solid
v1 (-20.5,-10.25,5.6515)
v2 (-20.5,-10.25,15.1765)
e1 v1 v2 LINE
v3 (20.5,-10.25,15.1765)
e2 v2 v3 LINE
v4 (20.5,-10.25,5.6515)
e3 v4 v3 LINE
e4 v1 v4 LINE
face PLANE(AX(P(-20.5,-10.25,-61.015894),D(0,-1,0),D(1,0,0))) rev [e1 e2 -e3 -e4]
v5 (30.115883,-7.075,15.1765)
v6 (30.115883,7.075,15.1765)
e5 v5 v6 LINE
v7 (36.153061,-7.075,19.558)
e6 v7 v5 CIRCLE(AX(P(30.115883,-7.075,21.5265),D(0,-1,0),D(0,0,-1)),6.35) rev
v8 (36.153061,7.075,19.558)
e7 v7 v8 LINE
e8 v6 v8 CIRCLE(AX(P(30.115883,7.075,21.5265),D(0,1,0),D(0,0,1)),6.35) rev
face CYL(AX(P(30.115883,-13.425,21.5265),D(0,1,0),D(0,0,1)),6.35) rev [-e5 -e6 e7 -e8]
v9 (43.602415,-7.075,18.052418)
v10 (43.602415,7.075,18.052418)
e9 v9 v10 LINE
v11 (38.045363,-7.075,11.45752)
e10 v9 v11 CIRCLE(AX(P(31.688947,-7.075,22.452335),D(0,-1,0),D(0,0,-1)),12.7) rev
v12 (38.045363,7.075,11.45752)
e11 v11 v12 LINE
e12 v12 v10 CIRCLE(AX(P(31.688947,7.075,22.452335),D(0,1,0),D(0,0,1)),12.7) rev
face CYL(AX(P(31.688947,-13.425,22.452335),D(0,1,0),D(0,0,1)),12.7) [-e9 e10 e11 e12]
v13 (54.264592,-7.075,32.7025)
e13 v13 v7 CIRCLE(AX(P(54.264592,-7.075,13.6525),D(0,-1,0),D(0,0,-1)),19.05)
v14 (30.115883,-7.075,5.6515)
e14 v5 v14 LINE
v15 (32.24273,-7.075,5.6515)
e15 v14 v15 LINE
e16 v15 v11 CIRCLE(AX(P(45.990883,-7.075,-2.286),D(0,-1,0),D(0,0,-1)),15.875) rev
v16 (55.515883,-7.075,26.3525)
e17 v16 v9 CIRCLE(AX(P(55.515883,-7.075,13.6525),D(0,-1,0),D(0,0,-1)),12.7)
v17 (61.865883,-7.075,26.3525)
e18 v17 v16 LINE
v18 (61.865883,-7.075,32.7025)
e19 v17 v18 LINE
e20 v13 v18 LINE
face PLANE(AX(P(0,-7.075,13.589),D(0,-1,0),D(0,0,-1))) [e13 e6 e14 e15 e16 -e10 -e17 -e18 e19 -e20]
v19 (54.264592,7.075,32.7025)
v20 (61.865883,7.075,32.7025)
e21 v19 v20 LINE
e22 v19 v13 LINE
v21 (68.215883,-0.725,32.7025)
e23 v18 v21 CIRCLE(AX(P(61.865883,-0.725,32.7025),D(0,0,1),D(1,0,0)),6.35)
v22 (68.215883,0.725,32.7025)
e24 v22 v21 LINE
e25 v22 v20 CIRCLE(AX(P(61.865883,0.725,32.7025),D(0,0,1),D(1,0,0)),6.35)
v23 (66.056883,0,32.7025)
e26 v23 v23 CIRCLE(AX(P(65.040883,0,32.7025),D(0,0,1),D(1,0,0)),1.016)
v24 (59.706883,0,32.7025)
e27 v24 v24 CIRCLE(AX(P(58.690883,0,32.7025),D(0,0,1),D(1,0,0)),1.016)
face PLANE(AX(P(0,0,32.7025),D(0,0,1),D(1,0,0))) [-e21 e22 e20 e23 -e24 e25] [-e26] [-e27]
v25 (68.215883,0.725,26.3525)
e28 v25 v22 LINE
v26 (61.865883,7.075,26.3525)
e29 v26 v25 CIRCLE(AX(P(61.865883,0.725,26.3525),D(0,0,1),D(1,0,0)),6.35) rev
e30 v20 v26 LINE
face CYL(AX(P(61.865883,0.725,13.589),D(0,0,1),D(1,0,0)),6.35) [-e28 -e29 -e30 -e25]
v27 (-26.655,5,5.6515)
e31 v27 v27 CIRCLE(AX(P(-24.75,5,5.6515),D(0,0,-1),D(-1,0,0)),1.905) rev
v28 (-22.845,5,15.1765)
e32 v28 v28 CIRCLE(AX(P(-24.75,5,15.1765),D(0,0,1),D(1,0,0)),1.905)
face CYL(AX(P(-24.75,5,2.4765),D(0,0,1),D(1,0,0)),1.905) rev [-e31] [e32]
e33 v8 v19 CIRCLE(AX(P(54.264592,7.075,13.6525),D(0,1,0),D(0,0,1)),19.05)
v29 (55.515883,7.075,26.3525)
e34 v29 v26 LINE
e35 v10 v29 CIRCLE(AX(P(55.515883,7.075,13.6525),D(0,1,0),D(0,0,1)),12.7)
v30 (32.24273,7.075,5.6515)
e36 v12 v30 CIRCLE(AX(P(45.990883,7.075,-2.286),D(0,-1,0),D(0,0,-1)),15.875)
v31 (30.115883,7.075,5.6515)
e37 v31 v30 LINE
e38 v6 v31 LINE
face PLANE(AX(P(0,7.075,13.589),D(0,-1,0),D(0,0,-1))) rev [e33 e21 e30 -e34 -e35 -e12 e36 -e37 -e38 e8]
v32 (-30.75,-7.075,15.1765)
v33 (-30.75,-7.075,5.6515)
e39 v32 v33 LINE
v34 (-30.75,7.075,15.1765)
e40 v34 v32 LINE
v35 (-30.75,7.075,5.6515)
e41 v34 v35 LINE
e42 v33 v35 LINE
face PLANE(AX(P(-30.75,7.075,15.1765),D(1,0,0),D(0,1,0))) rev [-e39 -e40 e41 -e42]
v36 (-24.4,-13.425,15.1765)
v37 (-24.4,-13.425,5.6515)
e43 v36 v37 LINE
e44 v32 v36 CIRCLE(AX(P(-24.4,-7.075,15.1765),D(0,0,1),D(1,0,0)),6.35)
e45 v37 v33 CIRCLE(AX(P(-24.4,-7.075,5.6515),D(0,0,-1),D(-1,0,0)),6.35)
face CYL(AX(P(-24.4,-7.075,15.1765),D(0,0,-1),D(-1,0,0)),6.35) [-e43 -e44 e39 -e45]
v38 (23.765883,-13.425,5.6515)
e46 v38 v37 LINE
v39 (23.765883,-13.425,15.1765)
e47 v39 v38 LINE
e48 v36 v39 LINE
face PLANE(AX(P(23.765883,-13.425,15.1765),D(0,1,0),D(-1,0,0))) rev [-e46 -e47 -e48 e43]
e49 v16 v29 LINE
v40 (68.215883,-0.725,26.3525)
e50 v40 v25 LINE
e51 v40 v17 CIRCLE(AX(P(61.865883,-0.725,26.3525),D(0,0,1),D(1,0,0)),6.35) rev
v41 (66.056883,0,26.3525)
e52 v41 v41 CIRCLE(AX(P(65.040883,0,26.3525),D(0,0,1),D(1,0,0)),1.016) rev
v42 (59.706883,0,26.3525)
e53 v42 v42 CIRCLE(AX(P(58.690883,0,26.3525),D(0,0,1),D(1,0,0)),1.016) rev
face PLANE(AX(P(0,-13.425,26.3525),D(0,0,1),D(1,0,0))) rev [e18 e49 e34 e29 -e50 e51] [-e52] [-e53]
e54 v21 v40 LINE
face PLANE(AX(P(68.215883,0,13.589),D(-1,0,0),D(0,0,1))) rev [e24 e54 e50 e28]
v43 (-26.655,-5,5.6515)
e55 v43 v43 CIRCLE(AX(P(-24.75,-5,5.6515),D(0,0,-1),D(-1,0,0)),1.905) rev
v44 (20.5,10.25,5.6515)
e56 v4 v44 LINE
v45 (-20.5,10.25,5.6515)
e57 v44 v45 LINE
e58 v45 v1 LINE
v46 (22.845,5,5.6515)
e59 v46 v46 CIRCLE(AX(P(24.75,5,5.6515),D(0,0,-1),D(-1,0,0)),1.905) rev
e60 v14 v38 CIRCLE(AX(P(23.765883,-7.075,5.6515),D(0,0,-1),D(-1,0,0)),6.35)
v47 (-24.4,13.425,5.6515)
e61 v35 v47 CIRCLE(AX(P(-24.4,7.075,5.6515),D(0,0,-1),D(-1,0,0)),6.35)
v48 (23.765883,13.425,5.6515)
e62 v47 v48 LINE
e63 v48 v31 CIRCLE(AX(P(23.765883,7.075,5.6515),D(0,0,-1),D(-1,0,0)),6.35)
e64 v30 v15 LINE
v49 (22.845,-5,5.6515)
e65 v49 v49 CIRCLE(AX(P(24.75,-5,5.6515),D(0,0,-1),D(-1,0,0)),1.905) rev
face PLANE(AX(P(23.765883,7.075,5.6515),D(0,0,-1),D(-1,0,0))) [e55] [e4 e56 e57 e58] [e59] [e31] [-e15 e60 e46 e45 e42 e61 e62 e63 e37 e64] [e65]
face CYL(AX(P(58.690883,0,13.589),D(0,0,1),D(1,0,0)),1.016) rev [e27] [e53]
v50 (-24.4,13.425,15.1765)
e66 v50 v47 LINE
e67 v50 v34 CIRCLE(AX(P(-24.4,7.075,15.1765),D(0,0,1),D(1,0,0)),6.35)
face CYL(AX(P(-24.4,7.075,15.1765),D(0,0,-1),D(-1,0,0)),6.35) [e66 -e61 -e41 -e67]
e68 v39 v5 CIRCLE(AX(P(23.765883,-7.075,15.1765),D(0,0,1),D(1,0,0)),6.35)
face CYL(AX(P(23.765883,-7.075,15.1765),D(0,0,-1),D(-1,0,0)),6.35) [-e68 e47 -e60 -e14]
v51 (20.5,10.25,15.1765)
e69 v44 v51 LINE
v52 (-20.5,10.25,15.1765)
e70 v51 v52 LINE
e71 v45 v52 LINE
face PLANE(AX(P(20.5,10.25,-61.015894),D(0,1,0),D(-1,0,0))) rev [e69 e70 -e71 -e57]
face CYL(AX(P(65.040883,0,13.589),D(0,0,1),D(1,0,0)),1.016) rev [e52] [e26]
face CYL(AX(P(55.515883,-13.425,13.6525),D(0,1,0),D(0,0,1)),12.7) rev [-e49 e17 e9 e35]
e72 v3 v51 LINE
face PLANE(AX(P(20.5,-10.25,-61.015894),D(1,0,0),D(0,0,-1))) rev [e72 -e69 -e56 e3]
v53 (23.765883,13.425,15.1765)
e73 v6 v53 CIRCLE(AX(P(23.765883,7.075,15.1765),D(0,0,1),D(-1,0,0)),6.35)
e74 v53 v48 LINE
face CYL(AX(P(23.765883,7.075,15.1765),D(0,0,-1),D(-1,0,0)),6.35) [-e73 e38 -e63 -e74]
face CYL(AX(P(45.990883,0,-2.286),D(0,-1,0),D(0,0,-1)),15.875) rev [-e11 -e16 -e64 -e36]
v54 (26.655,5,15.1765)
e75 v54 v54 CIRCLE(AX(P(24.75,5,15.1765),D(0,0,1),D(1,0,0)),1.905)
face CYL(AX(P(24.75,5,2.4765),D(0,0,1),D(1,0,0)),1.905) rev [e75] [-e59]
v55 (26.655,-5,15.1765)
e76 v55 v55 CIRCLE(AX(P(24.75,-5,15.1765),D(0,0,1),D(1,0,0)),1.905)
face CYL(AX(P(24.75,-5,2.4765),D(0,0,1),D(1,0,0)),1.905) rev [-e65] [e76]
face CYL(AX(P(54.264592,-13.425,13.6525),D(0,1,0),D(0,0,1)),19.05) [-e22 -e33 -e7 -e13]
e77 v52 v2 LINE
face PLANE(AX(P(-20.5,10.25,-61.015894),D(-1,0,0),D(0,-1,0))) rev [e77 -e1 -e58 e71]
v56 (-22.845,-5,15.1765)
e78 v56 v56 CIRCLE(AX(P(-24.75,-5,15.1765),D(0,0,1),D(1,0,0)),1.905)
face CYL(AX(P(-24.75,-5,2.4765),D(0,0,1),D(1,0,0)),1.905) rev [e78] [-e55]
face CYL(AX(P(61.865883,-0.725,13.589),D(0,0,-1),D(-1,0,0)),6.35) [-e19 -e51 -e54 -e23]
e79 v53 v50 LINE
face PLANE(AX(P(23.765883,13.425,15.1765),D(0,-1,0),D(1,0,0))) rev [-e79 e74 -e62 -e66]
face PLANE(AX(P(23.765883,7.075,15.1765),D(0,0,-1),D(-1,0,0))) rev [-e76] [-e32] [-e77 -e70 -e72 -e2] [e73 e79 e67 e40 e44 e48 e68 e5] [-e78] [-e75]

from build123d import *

# Parameters (mm, degrees)
BOSS_EXTRUDE1_DEPTH      = 15.1765
SKETCH3_W                = 41
SKETCH3_H                = 20.5
CUT_EXTRUDE1_DEPTH       = 27.178
SKETCH4_R                = 1.905
CUT_EXTRUDE2_DEPTH       = 12.7
SKETCH5_W                = 6.35
SKETCH5_H                = 9.525
CUT_EXTRUDE3_DEPTH       = 10.25
BOSS_EXTRUDE2_DEPTH      = 17.526
BOSS_EXTRUDE2_DEPTH_BACK = 1.5875
SKETCH7_W                = 38.1
SKETCH7_H                = 14.15
SKETCH7_R                = 1.016
FILLET3_R                = 15.875
FILLET4_R                = 6.35
CUT_EXTRUDE4_DEPTH       = 79.37799596
SKETCH11_W               = 161.059050972
SKETCH11_H               = 91.650514338
CUT_EXTRUDE5_DEPTH       = 20.828


with BuildPart() as part:
    # Sketch2 → Boss-Extrude1 (new, symmetric)
    with BuildSketch(Plane.XY):
        with BuildLine():
            Line((23.765883374, 13.425), (-24.4, 13.425))
            ThreePointArc((-24.4, 13.425), (-28.890128061, 11.565128061), (-30.75, 7.075))
            Line((-30.75, 7.075), (-30.75, -7.075))
            ThreePointArc((-30.75, -7.075), (-28.890128061, -11.565128061), (-24.4, -13.425))
            Line((-24.4, -13.425), (23.765883374, -13.425))
            ThreePointArc((23.765883374, -13.425), (28.256011435, -11.565128061), (30.115883374, -7.075))
            Line((30.115883374, -7.075), (30.115883374, 7.075))
            ThreePointArc((30.115883374, 7.075), (28.256011435, 11.565128061), (23.765883374, 13.425))
        make_face()
    extrude(amount=BOSS_EXTRUDE1_DEPTH, both=True)

    # Sketch3 → Cut-Extrude1 (cut)
    with BuildSketch(Plane.XY.offset(15.1765)):
        Rectangle(SKETCH3_W, SKETCH3_H)
    extrude(amount=-CUT_EXTRUDE1_DEPTH, mode=Mode.SUBTRACT)

    # Sketch4 → Cut-Extrude2 (cut)
    with BuildSketch(Plane.XY.offset(15.1765)):
        with Locations((-24.75, 5)):
            Circle(SKETCH4_R)
        with Locations((-24.75, -5)):
            Circle(SKETCH4_R)
        with Locations((24.75, -5)):
            Circle(SKETCH4_R)
        with Locations((24.75, 5)):
            Circle(SKETCH4_R)
    extrude(amount=-CUT_EXTRUDE2_DEPTH, mode=Mode.SUBTRACT)

    # Sketch5 → Cut-Extrude3 (cut)
    with BuildSketch(Plane.ZY.offset(30.75)):
        with Locations((-7.1755, 0)):
            Rectangle(SKETCH5_W, SKETCH5_H)
    extrude(amount=-CUT_EXTRUDE3_DEPTH, mode=Mode.SUBTRACT)


with BuildPart() as body_2:
    # Sketch7 → Boss-Extrude2 (new, two sides: drawn at the far end of the back side and taken through both)
    with BuildSketch(Plane.XY.offset(15.1765).offset(-BOSS_EXTRUDE2_DEPTH_BACK)):
        with Locations((49.165883374, 0)):
            Rectangle(SKETCH7_W, SKETCH7_H)
        with Locations((65.040883374, 0)):
            Circle(SKETCH7_R, mode=Mode.SUBTRACT)
        with Locations((58.690883374, 0)):
            Circle(SKETCH7_R, mode=Mode.SUBTRACT)
    extrude(amount=BOSS_EXTRUDE2_DEPTH + BOSS_EXTRUDE2_DEPTH_BACK)

    # Combine1: union part
    add(part.part)

    # Fillet3
    # the kernel refuses this fillet: 15.875 mm, written as the material it adds along each edge
    with BuildSketch(Plane(origin=(30.115883374, -7.075, 13.589), x_dir=(1, 0, 0), z_dir=(0, 1, 0))) as fillet3_piece_1:
        with BuildLine():
            CenterArc((FILLET3_R, FILLET3_R), FILLET3_R, 180, 90)
            Line((0, FILLET3_R), (0, 0))
            Line((0, 0), (FILLET3_R, 0))
        make_face()
    extrude(amount=14.15)

    # Fillet4
    fillet4_edges = [body_2.edges().sort_by_distance(p)[0] for p in [
        (68.215883374, -7.075, 23.14575),
        (68.215883374, 7.075, 23.14575),
    ]]
    fillet(fillet4_edges, radius=FILLET4_R)

    # Sketch9 → Cut-Extrude4 (cut, through all)
    with BuildSketch(Plane(origin=(0, 7.075, 0), x_dir=(1, 0, 0), z_dir=(0, 1, 0))):
        with BuildLine():
            Line((54.264591911, -32.7025), (24.88975776, -36.85029523))
            Line((24.88975776, -36.85029523), (30.115883374, -15.1765))
            ThreePointArc((30.115883374, -15.1765), (33.845663864, -16.387313537), (36.153060508, -19.558))
            ThreePointArc((36.153060508, -19.558), (43.075250443, -29.070059389), (54.264591911, -32.7025))
        make_face()
        with BuildLine():
            Line((59.502916407, -4.726647085), (70.262240595, -12.045992063))
            Line((70.262240595, -12.045992063), (68.215883374, -26.3525))
            Line((68.215883374, -26.3525), (55.515883374, -26.3525))
            ThreePointArc((55.515883374, -26.3525), (48.256026462, -24.072887594), (43.6024152, -18.052417734))
            ThreePointArc((43.6024152, -18.052417734), (41.400812879, -14.268836115), (38.045363181, -11.457519704))
            Line((38.045363181, -11.457519704), (42.798116213, -7.288485815))
            Line((42.798116213, -7.288485815), (59.502916407, -4.726647085))
        make_face()
    extrude(amount=-CUT_EXTRUDE4_DEPTH, mode=Mode.SUBTRACT)

    # Sketch11 → Cut-Extrude5 (cut)
    with BuildSketch(Plane(origin=(0, 0, -15.1765), x_dir=(-1, 0, 0), z_dir=(0, 0, -1))):
        Rectangle(SKETCH11_W, SKETCH11_H)
    extrude(amount=-CUT_EXTRUDE5_DEPTH, mode=Mode.SUBTRACT)


solid = body_2.part
